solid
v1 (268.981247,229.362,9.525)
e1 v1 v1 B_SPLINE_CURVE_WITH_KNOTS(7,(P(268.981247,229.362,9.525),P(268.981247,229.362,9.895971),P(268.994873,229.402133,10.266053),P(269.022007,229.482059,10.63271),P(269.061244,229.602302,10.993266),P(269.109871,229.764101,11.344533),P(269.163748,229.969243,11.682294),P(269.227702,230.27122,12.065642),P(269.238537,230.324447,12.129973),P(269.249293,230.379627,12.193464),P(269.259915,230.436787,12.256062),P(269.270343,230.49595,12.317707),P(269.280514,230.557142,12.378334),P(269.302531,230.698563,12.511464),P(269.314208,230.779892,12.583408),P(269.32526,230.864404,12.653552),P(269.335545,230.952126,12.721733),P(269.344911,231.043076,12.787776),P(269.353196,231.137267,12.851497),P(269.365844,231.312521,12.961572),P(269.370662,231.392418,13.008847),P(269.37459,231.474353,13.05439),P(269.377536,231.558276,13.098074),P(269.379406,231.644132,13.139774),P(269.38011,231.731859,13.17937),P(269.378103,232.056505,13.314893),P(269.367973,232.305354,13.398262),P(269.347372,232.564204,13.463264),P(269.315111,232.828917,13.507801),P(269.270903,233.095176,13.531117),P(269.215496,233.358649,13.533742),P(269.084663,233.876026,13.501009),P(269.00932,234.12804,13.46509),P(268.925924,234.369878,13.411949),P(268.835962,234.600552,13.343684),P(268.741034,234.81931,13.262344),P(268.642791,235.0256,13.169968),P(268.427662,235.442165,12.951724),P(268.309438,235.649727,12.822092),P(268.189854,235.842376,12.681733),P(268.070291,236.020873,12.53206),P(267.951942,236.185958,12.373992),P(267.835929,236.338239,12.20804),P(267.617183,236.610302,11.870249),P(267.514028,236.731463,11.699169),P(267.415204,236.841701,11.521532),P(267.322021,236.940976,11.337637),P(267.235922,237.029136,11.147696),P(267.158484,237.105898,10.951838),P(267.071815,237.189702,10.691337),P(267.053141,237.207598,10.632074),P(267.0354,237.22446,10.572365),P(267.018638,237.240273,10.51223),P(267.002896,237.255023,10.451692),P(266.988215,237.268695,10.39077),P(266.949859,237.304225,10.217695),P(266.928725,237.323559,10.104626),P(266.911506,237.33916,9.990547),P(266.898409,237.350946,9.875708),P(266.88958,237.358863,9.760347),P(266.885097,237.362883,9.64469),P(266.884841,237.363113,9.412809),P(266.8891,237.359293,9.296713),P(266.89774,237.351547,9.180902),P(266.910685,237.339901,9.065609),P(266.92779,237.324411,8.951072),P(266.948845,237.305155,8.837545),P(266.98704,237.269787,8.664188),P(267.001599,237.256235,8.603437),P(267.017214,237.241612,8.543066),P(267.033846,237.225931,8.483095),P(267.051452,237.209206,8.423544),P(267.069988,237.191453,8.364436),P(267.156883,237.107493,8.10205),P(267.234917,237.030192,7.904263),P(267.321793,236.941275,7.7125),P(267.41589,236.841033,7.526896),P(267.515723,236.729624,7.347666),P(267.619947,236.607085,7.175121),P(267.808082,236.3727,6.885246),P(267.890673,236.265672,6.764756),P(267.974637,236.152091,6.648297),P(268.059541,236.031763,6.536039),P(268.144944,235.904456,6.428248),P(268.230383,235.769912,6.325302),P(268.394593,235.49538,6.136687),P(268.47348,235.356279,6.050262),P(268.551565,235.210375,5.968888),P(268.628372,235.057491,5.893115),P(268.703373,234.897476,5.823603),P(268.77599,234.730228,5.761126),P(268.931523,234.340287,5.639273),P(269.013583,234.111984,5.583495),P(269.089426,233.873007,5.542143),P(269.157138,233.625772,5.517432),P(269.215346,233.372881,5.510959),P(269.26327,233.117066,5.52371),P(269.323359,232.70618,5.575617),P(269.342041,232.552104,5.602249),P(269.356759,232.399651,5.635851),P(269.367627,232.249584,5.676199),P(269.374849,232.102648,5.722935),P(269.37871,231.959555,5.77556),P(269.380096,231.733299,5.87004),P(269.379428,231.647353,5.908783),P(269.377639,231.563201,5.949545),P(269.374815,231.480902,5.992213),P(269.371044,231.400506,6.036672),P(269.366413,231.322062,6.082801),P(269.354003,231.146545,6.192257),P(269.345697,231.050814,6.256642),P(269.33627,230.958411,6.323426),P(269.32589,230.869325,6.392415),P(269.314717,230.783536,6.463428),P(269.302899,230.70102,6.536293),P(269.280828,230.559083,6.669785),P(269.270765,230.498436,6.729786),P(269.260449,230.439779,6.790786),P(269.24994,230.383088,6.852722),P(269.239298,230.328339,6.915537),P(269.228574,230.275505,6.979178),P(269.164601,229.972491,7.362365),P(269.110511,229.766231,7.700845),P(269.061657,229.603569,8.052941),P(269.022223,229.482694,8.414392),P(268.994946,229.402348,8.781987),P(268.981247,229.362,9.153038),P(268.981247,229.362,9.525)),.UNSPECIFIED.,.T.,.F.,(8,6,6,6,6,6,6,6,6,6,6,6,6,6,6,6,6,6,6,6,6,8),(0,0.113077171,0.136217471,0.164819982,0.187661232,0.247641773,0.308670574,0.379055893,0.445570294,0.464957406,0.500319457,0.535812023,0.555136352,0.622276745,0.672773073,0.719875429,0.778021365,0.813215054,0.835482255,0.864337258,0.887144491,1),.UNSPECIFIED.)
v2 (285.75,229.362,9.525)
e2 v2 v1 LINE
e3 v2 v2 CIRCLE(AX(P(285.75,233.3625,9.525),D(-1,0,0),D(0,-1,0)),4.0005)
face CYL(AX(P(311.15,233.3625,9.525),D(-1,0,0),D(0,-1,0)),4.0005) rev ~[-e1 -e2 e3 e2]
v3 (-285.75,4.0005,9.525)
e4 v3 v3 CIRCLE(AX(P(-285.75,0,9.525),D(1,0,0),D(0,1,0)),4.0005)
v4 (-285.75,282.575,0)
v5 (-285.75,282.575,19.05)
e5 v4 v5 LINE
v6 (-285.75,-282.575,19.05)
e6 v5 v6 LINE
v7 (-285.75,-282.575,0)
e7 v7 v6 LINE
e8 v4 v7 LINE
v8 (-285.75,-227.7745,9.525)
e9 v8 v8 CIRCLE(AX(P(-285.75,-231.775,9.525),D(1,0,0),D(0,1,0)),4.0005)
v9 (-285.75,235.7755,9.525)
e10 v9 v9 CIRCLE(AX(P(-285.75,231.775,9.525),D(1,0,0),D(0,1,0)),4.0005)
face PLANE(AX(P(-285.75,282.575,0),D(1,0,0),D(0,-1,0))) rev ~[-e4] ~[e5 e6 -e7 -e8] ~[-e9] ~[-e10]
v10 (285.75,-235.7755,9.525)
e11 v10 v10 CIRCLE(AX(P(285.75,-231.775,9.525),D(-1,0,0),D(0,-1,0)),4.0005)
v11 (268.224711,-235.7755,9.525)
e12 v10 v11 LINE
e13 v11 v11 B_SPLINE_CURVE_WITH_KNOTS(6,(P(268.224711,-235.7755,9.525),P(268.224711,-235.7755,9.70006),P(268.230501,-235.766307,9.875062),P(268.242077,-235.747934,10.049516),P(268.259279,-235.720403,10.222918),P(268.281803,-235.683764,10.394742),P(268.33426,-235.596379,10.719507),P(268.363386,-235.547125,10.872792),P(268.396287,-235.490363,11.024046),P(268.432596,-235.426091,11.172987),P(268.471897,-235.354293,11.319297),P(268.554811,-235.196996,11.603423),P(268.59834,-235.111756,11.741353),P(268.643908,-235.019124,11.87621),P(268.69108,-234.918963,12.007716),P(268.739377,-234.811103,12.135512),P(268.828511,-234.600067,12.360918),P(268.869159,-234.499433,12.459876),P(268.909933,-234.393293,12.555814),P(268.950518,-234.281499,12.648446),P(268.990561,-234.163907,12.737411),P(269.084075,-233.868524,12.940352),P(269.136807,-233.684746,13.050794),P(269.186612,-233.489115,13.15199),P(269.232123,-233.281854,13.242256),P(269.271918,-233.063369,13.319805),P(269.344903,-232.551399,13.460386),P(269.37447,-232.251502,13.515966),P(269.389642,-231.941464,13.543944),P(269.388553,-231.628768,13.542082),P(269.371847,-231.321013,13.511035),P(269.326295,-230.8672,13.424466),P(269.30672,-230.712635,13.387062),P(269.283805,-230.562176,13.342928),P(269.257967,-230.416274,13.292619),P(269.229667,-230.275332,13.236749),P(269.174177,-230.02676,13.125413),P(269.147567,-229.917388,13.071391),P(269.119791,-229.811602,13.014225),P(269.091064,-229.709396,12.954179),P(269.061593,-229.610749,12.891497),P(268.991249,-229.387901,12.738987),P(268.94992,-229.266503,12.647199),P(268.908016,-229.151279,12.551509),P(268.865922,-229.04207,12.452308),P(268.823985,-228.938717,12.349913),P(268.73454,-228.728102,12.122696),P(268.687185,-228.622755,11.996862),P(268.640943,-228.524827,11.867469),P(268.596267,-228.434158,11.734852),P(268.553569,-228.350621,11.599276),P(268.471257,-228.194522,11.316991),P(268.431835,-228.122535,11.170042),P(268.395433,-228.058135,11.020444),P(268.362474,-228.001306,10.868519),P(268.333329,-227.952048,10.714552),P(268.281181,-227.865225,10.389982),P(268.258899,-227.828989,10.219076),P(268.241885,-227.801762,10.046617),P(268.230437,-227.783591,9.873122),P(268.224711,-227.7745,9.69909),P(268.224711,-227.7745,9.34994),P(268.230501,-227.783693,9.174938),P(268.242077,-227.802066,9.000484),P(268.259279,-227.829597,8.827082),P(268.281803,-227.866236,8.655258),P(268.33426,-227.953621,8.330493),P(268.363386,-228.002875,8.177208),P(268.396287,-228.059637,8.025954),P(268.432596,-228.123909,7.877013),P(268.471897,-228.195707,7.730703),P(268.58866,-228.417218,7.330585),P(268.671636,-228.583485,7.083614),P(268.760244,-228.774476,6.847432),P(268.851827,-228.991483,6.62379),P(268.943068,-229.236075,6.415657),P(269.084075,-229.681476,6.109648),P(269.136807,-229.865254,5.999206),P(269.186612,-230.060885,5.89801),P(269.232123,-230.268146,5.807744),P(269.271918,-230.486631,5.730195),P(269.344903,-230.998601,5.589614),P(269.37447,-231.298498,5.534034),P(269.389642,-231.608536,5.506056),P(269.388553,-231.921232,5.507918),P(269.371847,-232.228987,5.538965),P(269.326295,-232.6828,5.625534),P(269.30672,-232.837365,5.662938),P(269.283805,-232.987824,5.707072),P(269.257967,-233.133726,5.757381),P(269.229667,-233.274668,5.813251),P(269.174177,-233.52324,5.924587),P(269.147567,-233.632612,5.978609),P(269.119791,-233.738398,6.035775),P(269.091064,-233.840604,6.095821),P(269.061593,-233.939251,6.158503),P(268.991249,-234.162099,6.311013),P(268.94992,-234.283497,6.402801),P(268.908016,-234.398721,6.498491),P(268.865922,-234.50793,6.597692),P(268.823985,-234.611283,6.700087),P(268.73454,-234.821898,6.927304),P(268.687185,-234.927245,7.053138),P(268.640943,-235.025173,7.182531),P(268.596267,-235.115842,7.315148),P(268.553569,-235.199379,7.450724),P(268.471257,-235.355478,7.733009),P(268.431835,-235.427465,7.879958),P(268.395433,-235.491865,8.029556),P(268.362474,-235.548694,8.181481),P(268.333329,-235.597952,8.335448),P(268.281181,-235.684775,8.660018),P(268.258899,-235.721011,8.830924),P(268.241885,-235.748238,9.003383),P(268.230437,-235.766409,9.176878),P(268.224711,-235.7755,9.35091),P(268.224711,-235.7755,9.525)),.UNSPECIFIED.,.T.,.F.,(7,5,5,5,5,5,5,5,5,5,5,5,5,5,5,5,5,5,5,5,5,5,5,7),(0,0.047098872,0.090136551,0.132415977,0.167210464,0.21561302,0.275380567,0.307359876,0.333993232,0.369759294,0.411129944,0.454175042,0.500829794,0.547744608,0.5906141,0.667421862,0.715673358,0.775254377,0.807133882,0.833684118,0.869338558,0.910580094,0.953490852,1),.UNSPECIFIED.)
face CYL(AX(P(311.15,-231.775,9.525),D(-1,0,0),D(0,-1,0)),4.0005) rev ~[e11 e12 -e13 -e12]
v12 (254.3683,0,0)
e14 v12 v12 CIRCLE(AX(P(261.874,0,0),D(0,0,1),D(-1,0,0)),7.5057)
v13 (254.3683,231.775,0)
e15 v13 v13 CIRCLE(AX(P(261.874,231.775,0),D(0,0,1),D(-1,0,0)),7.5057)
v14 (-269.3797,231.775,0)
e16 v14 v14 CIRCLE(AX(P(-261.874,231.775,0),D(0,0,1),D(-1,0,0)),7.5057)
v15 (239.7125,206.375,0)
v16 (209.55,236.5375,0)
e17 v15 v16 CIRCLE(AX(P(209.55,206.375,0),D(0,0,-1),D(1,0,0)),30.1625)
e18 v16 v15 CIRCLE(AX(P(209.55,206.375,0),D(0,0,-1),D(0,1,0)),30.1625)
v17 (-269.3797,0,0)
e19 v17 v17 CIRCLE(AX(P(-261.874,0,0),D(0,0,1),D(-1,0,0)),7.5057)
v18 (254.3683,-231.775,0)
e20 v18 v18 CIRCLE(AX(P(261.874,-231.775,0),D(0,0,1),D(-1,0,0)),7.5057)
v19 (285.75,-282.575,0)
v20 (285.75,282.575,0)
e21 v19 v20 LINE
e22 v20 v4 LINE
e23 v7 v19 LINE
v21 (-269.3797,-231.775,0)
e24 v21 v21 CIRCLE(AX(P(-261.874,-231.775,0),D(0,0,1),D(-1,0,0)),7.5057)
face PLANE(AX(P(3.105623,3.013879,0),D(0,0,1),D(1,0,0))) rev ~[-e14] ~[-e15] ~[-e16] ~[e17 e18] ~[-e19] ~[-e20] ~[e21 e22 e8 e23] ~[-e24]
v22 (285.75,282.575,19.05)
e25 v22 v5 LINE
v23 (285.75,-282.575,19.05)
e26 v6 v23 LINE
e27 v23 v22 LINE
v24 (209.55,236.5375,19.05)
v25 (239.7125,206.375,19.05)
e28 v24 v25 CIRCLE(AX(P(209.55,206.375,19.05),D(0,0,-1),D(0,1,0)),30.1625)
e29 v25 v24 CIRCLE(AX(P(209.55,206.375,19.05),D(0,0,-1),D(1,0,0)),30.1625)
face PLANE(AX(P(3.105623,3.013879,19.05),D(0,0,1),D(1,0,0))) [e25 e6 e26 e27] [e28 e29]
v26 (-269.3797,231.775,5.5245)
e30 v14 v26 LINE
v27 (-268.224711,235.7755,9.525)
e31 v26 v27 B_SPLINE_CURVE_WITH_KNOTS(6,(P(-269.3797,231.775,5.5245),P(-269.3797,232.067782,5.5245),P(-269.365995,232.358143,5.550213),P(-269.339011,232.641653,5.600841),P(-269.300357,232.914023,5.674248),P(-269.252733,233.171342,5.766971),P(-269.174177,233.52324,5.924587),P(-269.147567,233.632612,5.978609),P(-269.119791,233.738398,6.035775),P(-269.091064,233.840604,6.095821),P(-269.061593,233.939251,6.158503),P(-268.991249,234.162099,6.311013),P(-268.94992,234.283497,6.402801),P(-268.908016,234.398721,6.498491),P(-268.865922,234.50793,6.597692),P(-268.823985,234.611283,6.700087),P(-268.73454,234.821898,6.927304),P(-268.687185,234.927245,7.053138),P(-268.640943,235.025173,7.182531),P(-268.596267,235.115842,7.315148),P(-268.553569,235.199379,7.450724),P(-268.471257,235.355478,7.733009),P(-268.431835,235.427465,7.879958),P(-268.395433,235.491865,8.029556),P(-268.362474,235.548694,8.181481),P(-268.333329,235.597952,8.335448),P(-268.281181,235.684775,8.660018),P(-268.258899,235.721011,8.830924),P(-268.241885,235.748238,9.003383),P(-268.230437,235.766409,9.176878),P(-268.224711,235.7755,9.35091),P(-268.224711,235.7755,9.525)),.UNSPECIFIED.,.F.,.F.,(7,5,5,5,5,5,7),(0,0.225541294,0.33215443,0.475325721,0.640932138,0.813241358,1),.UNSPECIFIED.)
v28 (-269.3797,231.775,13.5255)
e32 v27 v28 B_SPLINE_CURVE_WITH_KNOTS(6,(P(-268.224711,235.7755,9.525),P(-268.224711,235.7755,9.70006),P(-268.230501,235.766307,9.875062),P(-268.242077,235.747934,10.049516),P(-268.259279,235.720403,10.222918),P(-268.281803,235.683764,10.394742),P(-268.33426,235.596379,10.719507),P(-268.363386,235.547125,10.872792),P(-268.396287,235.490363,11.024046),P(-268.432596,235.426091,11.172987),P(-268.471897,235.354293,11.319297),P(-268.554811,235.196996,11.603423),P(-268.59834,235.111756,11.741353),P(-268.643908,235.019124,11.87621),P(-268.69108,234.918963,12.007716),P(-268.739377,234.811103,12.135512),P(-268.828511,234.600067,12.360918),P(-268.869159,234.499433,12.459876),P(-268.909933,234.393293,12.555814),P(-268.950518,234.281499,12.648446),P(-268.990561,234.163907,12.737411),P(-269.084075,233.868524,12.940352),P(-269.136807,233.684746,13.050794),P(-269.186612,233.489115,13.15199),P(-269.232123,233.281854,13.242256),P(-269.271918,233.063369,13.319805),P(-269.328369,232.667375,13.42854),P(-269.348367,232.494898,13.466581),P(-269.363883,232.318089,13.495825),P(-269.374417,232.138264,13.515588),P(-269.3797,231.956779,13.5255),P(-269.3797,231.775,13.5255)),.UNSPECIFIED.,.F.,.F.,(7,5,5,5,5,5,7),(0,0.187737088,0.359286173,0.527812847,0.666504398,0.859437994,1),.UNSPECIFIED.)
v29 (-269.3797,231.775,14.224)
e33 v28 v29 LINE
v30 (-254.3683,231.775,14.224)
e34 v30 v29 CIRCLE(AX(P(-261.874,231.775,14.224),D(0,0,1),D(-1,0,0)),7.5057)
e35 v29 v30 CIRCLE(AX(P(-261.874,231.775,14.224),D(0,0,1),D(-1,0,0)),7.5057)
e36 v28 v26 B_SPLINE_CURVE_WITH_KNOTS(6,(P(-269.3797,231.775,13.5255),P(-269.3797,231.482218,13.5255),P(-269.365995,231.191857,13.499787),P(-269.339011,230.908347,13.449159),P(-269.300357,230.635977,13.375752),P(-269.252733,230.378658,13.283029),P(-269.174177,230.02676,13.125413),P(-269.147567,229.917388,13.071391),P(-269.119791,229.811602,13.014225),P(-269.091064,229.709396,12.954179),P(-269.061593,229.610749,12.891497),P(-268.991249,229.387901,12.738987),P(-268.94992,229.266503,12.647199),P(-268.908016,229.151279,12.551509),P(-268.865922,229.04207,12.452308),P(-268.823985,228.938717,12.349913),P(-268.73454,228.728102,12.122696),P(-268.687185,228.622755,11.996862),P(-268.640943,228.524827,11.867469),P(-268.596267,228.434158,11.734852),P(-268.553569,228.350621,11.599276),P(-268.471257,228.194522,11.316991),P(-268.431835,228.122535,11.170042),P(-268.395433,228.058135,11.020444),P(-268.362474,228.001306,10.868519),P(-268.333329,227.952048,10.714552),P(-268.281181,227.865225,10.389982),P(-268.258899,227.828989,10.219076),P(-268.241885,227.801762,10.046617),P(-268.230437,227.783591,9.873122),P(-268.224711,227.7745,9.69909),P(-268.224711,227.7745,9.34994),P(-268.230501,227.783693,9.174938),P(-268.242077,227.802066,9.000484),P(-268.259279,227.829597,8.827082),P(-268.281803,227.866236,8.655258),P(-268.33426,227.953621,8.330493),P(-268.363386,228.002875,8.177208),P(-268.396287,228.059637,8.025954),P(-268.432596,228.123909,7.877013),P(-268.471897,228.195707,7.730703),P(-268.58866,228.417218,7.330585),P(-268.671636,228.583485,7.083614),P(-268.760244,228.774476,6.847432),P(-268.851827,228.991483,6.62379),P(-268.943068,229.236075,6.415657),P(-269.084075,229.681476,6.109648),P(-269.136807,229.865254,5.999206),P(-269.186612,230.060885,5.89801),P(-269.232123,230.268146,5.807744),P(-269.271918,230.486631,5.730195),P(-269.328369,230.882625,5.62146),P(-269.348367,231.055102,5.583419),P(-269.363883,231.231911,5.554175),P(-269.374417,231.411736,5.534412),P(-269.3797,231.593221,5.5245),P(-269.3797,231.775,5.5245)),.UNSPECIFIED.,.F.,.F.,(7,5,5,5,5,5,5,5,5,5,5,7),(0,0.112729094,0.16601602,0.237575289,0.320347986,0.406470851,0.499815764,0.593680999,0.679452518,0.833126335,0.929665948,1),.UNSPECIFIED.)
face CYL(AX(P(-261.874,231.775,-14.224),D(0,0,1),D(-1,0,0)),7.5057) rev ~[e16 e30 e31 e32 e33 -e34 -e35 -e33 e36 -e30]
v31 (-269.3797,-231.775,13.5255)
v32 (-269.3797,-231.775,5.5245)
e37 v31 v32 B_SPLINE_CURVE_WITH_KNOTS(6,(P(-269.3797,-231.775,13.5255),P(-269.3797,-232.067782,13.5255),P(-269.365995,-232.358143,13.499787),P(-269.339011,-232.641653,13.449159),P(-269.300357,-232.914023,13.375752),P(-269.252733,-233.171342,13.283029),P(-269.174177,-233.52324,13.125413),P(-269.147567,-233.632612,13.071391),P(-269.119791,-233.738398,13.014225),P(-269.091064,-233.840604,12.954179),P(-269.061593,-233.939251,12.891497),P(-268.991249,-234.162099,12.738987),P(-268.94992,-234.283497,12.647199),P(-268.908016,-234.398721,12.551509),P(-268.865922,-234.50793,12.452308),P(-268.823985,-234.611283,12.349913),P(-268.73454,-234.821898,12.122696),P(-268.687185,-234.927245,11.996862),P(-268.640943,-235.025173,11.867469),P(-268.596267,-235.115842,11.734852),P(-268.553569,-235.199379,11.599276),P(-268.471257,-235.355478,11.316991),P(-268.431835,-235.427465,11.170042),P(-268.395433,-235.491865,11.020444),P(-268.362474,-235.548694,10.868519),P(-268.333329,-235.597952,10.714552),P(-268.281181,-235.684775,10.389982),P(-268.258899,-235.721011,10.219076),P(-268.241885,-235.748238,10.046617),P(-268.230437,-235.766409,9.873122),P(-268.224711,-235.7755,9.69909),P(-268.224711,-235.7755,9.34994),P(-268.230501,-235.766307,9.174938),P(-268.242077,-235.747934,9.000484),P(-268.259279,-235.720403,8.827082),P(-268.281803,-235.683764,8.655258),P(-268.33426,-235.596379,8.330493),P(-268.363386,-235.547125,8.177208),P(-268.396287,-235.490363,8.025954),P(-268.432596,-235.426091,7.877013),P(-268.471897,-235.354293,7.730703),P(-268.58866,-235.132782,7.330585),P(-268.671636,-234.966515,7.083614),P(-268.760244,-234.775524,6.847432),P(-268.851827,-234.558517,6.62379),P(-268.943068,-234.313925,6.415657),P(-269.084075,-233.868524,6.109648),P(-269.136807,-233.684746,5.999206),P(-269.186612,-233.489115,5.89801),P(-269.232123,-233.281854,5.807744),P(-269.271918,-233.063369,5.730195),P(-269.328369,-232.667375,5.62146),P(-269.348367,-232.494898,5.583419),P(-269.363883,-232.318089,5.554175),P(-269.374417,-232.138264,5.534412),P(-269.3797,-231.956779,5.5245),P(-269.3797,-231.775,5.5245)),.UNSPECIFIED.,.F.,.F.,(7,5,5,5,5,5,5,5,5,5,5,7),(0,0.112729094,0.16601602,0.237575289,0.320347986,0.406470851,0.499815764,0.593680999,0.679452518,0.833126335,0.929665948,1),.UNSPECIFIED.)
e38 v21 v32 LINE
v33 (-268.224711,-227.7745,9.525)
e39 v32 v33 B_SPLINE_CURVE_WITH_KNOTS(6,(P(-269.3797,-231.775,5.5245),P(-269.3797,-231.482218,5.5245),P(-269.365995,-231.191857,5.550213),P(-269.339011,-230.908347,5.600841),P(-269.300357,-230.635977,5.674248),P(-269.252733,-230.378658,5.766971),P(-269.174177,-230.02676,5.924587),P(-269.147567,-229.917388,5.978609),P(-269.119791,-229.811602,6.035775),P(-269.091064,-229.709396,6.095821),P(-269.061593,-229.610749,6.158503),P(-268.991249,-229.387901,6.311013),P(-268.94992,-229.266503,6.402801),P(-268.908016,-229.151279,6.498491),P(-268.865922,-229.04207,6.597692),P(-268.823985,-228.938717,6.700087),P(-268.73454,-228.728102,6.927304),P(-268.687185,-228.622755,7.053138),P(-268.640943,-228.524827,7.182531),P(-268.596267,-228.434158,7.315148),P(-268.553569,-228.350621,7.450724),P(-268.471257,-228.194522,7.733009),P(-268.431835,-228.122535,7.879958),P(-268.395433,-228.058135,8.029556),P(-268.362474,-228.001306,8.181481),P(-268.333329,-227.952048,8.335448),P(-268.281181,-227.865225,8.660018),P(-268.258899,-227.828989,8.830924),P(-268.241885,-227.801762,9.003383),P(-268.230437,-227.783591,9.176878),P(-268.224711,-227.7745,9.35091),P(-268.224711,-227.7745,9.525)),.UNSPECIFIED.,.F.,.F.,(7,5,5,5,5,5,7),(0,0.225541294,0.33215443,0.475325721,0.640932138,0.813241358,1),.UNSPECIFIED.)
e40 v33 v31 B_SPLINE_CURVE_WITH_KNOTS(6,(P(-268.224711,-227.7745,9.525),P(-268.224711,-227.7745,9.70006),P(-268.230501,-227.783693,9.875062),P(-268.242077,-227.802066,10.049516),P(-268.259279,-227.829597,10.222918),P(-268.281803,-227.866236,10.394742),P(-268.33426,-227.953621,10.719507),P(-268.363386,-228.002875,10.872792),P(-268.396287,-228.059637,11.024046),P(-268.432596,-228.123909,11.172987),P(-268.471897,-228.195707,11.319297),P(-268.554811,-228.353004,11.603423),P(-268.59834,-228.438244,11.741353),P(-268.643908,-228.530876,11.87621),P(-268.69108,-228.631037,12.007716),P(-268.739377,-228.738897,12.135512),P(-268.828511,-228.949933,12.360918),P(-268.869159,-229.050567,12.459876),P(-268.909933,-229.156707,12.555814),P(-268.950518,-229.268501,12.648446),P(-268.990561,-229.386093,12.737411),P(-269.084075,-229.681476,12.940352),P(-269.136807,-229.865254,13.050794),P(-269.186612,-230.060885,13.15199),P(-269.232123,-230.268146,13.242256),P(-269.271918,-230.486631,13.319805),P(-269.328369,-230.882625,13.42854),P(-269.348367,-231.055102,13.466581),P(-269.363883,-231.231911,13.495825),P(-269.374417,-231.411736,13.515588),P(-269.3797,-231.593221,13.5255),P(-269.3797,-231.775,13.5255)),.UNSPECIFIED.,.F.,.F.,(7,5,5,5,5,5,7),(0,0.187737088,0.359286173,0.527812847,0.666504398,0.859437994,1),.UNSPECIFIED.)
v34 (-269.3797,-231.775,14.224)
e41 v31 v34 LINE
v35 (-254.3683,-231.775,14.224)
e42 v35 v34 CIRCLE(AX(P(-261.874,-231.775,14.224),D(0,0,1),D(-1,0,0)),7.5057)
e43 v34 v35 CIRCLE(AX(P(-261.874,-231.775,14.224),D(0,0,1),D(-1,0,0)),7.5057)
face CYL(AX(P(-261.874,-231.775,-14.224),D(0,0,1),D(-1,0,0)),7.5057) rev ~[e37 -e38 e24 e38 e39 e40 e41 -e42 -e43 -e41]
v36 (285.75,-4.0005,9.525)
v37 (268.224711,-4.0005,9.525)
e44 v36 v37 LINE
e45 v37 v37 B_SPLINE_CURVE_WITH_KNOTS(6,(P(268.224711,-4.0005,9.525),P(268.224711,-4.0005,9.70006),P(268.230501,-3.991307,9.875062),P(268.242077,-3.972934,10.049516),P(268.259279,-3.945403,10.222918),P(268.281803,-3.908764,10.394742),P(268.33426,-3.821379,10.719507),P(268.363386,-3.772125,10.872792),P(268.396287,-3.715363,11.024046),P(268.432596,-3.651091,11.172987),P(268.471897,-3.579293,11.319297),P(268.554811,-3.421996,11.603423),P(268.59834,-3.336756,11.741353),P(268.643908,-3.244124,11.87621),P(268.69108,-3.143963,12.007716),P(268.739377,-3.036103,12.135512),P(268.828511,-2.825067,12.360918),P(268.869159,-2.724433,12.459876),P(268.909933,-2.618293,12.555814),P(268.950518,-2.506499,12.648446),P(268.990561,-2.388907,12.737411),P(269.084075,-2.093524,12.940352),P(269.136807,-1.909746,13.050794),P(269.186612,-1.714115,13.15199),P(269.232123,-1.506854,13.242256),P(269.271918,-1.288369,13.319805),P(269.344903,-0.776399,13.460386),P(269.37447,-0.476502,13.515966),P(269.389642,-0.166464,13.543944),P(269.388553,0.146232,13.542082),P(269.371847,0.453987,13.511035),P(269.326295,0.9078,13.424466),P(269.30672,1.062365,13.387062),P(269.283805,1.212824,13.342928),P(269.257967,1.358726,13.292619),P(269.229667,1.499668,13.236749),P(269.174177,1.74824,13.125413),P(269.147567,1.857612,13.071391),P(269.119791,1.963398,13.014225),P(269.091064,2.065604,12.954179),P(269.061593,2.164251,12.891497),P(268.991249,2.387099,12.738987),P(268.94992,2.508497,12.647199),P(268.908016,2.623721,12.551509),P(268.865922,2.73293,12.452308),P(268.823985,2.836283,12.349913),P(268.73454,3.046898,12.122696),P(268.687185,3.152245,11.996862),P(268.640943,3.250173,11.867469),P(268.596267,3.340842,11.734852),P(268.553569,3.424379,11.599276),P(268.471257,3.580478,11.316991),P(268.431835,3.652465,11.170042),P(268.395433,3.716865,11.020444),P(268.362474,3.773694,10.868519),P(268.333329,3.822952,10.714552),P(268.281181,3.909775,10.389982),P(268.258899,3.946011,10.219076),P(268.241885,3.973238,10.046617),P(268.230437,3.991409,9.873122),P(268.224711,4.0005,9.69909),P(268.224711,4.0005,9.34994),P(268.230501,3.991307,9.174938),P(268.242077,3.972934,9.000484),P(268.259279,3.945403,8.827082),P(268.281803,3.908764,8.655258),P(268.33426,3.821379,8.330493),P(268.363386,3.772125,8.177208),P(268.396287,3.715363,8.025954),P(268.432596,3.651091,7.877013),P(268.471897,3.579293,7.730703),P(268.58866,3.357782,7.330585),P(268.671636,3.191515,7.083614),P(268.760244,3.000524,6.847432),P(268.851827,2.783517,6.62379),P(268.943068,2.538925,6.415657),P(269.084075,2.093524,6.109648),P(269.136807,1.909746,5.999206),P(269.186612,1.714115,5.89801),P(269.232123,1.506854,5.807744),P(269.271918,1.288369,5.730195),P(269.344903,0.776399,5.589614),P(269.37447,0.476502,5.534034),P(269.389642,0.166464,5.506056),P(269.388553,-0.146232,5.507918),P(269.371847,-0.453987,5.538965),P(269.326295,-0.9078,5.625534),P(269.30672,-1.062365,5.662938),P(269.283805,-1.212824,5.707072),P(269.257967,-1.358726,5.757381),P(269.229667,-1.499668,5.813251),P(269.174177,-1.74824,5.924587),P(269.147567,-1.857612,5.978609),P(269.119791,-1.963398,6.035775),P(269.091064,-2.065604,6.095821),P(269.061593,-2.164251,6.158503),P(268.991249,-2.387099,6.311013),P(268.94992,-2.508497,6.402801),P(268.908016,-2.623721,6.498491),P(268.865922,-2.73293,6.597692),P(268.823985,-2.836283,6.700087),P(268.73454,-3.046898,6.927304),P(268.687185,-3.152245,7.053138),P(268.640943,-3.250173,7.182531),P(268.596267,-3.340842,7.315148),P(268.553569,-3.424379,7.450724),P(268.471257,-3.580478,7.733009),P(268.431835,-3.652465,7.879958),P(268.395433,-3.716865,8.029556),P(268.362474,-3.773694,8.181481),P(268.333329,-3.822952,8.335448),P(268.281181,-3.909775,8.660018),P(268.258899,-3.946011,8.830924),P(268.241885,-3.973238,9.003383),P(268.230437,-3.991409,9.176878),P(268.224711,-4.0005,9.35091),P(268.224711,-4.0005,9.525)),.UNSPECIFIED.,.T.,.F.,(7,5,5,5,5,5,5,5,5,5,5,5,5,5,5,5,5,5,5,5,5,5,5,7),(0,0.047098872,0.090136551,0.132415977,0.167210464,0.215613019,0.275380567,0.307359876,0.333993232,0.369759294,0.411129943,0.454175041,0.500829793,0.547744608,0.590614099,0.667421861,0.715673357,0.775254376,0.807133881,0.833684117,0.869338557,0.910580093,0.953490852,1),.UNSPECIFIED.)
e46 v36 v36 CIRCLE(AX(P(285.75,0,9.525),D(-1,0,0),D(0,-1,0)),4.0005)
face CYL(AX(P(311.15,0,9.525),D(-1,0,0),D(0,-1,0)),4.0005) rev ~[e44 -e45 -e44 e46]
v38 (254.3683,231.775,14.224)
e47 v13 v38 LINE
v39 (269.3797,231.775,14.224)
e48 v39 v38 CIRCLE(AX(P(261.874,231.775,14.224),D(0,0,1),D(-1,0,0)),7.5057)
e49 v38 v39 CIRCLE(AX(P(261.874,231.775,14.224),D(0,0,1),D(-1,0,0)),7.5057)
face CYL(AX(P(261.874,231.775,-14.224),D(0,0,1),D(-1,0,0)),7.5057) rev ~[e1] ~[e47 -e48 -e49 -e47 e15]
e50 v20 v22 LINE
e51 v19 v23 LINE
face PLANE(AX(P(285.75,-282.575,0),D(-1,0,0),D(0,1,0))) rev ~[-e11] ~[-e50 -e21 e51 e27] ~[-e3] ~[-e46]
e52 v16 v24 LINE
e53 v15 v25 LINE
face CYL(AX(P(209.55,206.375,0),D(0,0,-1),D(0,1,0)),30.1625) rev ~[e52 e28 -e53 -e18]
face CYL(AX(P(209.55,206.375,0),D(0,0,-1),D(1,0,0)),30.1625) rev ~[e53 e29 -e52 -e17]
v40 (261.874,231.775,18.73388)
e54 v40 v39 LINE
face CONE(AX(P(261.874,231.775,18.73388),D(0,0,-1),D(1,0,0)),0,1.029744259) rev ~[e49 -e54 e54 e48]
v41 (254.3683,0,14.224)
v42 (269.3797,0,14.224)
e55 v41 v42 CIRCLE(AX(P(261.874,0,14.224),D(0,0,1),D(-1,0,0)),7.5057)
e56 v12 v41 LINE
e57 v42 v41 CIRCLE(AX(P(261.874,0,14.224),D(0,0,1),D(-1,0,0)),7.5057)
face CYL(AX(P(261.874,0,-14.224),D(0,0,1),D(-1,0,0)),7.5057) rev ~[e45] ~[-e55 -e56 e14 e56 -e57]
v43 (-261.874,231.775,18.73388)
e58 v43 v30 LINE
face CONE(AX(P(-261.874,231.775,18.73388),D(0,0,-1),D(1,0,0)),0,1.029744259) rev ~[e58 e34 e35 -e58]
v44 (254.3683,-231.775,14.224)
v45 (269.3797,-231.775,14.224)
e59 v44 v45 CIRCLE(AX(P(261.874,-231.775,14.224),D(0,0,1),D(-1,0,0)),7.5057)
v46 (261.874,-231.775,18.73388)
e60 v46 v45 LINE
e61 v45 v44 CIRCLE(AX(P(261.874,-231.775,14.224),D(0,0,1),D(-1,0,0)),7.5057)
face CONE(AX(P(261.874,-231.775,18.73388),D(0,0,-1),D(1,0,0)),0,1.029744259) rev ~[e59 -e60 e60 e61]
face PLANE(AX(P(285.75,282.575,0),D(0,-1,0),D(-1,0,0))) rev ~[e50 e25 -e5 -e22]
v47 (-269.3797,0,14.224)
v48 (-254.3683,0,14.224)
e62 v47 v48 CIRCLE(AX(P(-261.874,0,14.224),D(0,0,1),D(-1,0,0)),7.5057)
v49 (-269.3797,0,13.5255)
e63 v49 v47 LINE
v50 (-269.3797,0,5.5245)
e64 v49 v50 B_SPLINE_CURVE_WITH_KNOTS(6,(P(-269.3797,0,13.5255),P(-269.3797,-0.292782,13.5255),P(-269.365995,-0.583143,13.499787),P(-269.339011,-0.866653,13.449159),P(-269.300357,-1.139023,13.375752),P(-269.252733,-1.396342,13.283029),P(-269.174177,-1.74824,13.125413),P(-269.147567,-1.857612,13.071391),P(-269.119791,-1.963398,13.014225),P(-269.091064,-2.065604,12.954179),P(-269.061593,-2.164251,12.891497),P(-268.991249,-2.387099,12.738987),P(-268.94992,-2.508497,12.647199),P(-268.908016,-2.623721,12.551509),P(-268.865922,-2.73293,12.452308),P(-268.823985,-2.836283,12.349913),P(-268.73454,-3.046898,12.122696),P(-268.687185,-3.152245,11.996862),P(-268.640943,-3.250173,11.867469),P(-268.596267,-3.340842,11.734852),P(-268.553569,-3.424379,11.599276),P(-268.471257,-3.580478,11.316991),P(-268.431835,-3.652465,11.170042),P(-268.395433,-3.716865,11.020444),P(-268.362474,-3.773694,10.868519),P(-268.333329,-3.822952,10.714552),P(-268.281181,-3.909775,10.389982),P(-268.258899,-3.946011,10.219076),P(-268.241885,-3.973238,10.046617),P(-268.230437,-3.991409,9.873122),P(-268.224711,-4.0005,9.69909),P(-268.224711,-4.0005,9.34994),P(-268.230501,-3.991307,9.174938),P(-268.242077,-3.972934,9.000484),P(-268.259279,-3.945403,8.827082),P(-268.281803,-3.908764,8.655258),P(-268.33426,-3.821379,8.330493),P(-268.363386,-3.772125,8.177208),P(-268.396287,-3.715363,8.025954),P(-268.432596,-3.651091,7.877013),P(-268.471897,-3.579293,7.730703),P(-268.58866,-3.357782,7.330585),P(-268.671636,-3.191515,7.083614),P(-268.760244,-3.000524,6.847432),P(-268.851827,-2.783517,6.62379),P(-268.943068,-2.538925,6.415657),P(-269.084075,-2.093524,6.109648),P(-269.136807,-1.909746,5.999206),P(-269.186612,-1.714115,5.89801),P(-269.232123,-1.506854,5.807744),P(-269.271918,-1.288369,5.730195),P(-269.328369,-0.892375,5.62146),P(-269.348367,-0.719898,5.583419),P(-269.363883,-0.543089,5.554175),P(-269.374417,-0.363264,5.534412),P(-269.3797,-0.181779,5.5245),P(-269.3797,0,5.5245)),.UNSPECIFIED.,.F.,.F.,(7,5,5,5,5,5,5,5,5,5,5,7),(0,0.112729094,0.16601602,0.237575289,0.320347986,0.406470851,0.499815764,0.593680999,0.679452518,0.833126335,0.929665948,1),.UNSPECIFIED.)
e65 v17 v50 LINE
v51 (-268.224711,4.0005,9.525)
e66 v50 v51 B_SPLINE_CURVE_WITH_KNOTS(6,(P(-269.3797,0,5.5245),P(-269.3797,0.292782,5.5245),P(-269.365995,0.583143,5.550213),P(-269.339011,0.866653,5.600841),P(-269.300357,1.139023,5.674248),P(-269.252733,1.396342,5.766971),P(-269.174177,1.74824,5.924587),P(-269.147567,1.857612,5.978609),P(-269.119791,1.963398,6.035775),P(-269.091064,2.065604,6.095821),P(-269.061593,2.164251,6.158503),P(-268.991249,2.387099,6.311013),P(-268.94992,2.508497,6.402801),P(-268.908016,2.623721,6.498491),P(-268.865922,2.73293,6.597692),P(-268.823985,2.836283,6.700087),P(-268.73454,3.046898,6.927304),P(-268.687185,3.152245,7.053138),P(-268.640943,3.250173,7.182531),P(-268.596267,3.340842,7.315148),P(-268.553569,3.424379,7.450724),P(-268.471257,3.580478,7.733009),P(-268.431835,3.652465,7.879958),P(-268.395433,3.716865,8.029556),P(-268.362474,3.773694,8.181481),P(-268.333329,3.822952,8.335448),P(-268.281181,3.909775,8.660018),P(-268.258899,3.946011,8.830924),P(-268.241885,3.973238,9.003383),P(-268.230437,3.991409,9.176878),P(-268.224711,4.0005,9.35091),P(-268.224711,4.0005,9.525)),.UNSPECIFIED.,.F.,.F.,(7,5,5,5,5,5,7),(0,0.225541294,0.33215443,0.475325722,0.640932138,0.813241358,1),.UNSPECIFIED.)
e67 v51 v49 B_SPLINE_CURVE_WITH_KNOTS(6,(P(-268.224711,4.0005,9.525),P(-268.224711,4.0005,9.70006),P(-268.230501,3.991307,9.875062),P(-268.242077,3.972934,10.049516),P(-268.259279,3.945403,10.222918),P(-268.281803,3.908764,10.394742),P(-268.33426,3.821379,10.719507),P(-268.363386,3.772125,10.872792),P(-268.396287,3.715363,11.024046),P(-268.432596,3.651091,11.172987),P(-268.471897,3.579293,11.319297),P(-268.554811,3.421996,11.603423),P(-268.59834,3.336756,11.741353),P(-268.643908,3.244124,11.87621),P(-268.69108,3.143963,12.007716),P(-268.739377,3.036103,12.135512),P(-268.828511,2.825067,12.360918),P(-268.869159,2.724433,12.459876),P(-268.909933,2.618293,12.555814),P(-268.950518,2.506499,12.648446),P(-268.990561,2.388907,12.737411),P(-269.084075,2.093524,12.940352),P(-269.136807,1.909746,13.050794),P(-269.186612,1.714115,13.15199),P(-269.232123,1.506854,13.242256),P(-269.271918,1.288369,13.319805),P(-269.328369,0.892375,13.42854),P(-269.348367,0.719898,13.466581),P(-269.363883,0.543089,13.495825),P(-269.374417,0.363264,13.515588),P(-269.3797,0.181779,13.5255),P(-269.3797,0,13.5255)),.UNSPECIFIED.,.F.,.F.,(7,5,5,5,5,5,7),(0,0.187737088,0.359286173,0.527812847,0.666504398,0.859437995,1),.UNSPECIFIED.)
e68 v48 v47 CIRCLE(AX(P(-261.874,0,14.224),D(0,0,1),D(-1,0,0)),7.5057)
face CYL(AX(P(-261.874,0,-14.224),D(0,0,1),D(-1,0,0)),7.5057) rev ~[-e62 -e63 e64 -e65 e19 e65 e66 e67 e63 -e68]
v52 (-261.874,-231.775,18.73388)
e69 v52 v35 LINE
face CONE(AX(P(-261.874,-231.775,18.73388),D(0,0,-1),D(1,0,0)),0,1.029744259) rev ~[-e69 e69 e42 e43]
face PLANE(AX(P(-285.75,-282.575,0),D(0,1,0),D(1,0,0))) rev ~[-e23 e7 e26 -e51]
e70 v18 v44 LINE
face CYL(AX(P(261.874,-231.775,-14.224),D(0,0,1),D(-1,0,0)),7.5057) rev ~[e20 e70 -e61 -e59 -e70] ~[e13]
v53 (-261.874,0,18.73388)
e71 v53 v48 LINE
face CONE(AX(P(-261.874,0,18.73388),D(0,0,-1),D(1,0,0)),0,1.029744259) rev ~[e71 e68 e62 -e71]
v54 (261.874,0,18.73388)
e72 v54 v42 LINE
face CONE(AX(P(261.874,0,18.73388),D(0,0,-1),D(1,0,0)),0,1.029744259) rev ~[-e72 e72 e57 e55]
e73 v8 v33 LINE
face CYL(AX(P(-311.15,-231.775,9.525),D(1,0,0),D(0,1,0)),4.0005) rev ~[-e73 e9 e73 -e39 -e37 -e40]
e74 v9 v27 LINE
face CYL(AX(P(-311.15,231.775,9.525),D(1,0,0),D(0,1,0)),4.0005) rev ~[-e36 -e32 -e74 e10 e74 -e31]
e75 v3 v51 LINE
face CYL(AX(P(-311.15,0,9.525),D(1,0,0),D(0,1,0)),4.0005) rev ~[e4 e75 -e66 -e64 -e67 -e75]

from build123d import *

# Parameters (mm, degrees)
F1_DEPTH = 19.05
F3_D     = 15.0114
F3_DEPTH = 14.224
F3_TIP   = 4.5098795482
F5_D     = 8.001
F5_DEPTH = 25.4
F5_TIP   = 2.4037429064
F7_D     = 8.001
F7_DEPTH = 25.4
F7_TIP   = 2.4037429064


# Not quite as in the source:
# - a feature names something its author has since deleted; it is built from what else it names


with BuildPart() as f1:
    # F0 (on Top) → F1 (new body)
    with BuildSketch(Plane.XY):
        with BuildLine():
            Line((209.55, 236.5375), (209.55, 282.575))
            Line((209.55, 282.575), (-285.75, 282.575))
            Line((-285.75, 282.575), (-285.75, -282.575))
            Line((-285.75, -282.575), (285.75, -282.575))
            Line((285.75, -282.575), (285.75, 206.375))
            Line((285.75, 206.375), (239.7125, 206.375))
            ThreePointArc((239.7125, 206.375), (188.2218917125, 185.0468917125), (209.55, 236.5375))
        make_face()
        with BuildLine():
            Line((285.75, 206.375), (285.75, 282.575))
            Line((285.75, 282.575), (209.55, 282.575))
            Line((209.55, 282.575), (209.55, 236.5375))
            ThreePointArc((209.55, 236.5375), (230.8781082875, 227.7031082875), (239.7125, 206.375))
            Line((239.7125, 206.375), (285.75, 206.375))
        make_face()
    extrude(amount=F1_DEPTH)

    # F3
    with Locations(Plane(origin=(0, 0, 0), x_dir=(1, 0, 0), z_dir=(0, 0, -1))):
        with Locations((-261.874, 231.775), (261.874, 231.775), (-261.874, 0), (261.874, 0), (261.874, -231.775), (-261.874, -231.775)):
            Hole(F3_D / 2, depth=F3_DEPTH)
            with Locations((0, 0, -(F3_DEPTH + F3_TIP / 2))):  # 118° drill point
                Cone(0, F3_D / 2, F3_TIP, mode=Mode.SUBTRACT)

    # F5
    with Locations(Plane.YZ.offset(285.75)):
        with Locations((-231.775, 9.525), (0, 9.525), (233.3625, 9.525)):
            Hole(F5_D / 2, depth=F5_DEPTH)
            with Locations((0, 0, -(F5_DEPTH + F5_TIP / 2))):  # 118° drill point
                Cone(0, F5_D / 2, F5_TIP, mode=Mode.SUBTRACT)

    # F7
    with Locations(Plane(origin=(-285.75, 0, 0), x_dir=(0, -1, 0), z_dir=(-1, 0, 0))):
        with Locations((0, 9.525), (231.775, 9.525), (-231.775, 9.525)):
            Hole(F7_D / 2, depth=F7_DEPTH)
            with Locations((0, 0, -(F7_DEPTH + F7_TIP / 2))):  # 118° drill point
                Cone(0, F7_D / 2, F7_TIP, mode=Mode.SUBTRACT)


solid = f1.part
